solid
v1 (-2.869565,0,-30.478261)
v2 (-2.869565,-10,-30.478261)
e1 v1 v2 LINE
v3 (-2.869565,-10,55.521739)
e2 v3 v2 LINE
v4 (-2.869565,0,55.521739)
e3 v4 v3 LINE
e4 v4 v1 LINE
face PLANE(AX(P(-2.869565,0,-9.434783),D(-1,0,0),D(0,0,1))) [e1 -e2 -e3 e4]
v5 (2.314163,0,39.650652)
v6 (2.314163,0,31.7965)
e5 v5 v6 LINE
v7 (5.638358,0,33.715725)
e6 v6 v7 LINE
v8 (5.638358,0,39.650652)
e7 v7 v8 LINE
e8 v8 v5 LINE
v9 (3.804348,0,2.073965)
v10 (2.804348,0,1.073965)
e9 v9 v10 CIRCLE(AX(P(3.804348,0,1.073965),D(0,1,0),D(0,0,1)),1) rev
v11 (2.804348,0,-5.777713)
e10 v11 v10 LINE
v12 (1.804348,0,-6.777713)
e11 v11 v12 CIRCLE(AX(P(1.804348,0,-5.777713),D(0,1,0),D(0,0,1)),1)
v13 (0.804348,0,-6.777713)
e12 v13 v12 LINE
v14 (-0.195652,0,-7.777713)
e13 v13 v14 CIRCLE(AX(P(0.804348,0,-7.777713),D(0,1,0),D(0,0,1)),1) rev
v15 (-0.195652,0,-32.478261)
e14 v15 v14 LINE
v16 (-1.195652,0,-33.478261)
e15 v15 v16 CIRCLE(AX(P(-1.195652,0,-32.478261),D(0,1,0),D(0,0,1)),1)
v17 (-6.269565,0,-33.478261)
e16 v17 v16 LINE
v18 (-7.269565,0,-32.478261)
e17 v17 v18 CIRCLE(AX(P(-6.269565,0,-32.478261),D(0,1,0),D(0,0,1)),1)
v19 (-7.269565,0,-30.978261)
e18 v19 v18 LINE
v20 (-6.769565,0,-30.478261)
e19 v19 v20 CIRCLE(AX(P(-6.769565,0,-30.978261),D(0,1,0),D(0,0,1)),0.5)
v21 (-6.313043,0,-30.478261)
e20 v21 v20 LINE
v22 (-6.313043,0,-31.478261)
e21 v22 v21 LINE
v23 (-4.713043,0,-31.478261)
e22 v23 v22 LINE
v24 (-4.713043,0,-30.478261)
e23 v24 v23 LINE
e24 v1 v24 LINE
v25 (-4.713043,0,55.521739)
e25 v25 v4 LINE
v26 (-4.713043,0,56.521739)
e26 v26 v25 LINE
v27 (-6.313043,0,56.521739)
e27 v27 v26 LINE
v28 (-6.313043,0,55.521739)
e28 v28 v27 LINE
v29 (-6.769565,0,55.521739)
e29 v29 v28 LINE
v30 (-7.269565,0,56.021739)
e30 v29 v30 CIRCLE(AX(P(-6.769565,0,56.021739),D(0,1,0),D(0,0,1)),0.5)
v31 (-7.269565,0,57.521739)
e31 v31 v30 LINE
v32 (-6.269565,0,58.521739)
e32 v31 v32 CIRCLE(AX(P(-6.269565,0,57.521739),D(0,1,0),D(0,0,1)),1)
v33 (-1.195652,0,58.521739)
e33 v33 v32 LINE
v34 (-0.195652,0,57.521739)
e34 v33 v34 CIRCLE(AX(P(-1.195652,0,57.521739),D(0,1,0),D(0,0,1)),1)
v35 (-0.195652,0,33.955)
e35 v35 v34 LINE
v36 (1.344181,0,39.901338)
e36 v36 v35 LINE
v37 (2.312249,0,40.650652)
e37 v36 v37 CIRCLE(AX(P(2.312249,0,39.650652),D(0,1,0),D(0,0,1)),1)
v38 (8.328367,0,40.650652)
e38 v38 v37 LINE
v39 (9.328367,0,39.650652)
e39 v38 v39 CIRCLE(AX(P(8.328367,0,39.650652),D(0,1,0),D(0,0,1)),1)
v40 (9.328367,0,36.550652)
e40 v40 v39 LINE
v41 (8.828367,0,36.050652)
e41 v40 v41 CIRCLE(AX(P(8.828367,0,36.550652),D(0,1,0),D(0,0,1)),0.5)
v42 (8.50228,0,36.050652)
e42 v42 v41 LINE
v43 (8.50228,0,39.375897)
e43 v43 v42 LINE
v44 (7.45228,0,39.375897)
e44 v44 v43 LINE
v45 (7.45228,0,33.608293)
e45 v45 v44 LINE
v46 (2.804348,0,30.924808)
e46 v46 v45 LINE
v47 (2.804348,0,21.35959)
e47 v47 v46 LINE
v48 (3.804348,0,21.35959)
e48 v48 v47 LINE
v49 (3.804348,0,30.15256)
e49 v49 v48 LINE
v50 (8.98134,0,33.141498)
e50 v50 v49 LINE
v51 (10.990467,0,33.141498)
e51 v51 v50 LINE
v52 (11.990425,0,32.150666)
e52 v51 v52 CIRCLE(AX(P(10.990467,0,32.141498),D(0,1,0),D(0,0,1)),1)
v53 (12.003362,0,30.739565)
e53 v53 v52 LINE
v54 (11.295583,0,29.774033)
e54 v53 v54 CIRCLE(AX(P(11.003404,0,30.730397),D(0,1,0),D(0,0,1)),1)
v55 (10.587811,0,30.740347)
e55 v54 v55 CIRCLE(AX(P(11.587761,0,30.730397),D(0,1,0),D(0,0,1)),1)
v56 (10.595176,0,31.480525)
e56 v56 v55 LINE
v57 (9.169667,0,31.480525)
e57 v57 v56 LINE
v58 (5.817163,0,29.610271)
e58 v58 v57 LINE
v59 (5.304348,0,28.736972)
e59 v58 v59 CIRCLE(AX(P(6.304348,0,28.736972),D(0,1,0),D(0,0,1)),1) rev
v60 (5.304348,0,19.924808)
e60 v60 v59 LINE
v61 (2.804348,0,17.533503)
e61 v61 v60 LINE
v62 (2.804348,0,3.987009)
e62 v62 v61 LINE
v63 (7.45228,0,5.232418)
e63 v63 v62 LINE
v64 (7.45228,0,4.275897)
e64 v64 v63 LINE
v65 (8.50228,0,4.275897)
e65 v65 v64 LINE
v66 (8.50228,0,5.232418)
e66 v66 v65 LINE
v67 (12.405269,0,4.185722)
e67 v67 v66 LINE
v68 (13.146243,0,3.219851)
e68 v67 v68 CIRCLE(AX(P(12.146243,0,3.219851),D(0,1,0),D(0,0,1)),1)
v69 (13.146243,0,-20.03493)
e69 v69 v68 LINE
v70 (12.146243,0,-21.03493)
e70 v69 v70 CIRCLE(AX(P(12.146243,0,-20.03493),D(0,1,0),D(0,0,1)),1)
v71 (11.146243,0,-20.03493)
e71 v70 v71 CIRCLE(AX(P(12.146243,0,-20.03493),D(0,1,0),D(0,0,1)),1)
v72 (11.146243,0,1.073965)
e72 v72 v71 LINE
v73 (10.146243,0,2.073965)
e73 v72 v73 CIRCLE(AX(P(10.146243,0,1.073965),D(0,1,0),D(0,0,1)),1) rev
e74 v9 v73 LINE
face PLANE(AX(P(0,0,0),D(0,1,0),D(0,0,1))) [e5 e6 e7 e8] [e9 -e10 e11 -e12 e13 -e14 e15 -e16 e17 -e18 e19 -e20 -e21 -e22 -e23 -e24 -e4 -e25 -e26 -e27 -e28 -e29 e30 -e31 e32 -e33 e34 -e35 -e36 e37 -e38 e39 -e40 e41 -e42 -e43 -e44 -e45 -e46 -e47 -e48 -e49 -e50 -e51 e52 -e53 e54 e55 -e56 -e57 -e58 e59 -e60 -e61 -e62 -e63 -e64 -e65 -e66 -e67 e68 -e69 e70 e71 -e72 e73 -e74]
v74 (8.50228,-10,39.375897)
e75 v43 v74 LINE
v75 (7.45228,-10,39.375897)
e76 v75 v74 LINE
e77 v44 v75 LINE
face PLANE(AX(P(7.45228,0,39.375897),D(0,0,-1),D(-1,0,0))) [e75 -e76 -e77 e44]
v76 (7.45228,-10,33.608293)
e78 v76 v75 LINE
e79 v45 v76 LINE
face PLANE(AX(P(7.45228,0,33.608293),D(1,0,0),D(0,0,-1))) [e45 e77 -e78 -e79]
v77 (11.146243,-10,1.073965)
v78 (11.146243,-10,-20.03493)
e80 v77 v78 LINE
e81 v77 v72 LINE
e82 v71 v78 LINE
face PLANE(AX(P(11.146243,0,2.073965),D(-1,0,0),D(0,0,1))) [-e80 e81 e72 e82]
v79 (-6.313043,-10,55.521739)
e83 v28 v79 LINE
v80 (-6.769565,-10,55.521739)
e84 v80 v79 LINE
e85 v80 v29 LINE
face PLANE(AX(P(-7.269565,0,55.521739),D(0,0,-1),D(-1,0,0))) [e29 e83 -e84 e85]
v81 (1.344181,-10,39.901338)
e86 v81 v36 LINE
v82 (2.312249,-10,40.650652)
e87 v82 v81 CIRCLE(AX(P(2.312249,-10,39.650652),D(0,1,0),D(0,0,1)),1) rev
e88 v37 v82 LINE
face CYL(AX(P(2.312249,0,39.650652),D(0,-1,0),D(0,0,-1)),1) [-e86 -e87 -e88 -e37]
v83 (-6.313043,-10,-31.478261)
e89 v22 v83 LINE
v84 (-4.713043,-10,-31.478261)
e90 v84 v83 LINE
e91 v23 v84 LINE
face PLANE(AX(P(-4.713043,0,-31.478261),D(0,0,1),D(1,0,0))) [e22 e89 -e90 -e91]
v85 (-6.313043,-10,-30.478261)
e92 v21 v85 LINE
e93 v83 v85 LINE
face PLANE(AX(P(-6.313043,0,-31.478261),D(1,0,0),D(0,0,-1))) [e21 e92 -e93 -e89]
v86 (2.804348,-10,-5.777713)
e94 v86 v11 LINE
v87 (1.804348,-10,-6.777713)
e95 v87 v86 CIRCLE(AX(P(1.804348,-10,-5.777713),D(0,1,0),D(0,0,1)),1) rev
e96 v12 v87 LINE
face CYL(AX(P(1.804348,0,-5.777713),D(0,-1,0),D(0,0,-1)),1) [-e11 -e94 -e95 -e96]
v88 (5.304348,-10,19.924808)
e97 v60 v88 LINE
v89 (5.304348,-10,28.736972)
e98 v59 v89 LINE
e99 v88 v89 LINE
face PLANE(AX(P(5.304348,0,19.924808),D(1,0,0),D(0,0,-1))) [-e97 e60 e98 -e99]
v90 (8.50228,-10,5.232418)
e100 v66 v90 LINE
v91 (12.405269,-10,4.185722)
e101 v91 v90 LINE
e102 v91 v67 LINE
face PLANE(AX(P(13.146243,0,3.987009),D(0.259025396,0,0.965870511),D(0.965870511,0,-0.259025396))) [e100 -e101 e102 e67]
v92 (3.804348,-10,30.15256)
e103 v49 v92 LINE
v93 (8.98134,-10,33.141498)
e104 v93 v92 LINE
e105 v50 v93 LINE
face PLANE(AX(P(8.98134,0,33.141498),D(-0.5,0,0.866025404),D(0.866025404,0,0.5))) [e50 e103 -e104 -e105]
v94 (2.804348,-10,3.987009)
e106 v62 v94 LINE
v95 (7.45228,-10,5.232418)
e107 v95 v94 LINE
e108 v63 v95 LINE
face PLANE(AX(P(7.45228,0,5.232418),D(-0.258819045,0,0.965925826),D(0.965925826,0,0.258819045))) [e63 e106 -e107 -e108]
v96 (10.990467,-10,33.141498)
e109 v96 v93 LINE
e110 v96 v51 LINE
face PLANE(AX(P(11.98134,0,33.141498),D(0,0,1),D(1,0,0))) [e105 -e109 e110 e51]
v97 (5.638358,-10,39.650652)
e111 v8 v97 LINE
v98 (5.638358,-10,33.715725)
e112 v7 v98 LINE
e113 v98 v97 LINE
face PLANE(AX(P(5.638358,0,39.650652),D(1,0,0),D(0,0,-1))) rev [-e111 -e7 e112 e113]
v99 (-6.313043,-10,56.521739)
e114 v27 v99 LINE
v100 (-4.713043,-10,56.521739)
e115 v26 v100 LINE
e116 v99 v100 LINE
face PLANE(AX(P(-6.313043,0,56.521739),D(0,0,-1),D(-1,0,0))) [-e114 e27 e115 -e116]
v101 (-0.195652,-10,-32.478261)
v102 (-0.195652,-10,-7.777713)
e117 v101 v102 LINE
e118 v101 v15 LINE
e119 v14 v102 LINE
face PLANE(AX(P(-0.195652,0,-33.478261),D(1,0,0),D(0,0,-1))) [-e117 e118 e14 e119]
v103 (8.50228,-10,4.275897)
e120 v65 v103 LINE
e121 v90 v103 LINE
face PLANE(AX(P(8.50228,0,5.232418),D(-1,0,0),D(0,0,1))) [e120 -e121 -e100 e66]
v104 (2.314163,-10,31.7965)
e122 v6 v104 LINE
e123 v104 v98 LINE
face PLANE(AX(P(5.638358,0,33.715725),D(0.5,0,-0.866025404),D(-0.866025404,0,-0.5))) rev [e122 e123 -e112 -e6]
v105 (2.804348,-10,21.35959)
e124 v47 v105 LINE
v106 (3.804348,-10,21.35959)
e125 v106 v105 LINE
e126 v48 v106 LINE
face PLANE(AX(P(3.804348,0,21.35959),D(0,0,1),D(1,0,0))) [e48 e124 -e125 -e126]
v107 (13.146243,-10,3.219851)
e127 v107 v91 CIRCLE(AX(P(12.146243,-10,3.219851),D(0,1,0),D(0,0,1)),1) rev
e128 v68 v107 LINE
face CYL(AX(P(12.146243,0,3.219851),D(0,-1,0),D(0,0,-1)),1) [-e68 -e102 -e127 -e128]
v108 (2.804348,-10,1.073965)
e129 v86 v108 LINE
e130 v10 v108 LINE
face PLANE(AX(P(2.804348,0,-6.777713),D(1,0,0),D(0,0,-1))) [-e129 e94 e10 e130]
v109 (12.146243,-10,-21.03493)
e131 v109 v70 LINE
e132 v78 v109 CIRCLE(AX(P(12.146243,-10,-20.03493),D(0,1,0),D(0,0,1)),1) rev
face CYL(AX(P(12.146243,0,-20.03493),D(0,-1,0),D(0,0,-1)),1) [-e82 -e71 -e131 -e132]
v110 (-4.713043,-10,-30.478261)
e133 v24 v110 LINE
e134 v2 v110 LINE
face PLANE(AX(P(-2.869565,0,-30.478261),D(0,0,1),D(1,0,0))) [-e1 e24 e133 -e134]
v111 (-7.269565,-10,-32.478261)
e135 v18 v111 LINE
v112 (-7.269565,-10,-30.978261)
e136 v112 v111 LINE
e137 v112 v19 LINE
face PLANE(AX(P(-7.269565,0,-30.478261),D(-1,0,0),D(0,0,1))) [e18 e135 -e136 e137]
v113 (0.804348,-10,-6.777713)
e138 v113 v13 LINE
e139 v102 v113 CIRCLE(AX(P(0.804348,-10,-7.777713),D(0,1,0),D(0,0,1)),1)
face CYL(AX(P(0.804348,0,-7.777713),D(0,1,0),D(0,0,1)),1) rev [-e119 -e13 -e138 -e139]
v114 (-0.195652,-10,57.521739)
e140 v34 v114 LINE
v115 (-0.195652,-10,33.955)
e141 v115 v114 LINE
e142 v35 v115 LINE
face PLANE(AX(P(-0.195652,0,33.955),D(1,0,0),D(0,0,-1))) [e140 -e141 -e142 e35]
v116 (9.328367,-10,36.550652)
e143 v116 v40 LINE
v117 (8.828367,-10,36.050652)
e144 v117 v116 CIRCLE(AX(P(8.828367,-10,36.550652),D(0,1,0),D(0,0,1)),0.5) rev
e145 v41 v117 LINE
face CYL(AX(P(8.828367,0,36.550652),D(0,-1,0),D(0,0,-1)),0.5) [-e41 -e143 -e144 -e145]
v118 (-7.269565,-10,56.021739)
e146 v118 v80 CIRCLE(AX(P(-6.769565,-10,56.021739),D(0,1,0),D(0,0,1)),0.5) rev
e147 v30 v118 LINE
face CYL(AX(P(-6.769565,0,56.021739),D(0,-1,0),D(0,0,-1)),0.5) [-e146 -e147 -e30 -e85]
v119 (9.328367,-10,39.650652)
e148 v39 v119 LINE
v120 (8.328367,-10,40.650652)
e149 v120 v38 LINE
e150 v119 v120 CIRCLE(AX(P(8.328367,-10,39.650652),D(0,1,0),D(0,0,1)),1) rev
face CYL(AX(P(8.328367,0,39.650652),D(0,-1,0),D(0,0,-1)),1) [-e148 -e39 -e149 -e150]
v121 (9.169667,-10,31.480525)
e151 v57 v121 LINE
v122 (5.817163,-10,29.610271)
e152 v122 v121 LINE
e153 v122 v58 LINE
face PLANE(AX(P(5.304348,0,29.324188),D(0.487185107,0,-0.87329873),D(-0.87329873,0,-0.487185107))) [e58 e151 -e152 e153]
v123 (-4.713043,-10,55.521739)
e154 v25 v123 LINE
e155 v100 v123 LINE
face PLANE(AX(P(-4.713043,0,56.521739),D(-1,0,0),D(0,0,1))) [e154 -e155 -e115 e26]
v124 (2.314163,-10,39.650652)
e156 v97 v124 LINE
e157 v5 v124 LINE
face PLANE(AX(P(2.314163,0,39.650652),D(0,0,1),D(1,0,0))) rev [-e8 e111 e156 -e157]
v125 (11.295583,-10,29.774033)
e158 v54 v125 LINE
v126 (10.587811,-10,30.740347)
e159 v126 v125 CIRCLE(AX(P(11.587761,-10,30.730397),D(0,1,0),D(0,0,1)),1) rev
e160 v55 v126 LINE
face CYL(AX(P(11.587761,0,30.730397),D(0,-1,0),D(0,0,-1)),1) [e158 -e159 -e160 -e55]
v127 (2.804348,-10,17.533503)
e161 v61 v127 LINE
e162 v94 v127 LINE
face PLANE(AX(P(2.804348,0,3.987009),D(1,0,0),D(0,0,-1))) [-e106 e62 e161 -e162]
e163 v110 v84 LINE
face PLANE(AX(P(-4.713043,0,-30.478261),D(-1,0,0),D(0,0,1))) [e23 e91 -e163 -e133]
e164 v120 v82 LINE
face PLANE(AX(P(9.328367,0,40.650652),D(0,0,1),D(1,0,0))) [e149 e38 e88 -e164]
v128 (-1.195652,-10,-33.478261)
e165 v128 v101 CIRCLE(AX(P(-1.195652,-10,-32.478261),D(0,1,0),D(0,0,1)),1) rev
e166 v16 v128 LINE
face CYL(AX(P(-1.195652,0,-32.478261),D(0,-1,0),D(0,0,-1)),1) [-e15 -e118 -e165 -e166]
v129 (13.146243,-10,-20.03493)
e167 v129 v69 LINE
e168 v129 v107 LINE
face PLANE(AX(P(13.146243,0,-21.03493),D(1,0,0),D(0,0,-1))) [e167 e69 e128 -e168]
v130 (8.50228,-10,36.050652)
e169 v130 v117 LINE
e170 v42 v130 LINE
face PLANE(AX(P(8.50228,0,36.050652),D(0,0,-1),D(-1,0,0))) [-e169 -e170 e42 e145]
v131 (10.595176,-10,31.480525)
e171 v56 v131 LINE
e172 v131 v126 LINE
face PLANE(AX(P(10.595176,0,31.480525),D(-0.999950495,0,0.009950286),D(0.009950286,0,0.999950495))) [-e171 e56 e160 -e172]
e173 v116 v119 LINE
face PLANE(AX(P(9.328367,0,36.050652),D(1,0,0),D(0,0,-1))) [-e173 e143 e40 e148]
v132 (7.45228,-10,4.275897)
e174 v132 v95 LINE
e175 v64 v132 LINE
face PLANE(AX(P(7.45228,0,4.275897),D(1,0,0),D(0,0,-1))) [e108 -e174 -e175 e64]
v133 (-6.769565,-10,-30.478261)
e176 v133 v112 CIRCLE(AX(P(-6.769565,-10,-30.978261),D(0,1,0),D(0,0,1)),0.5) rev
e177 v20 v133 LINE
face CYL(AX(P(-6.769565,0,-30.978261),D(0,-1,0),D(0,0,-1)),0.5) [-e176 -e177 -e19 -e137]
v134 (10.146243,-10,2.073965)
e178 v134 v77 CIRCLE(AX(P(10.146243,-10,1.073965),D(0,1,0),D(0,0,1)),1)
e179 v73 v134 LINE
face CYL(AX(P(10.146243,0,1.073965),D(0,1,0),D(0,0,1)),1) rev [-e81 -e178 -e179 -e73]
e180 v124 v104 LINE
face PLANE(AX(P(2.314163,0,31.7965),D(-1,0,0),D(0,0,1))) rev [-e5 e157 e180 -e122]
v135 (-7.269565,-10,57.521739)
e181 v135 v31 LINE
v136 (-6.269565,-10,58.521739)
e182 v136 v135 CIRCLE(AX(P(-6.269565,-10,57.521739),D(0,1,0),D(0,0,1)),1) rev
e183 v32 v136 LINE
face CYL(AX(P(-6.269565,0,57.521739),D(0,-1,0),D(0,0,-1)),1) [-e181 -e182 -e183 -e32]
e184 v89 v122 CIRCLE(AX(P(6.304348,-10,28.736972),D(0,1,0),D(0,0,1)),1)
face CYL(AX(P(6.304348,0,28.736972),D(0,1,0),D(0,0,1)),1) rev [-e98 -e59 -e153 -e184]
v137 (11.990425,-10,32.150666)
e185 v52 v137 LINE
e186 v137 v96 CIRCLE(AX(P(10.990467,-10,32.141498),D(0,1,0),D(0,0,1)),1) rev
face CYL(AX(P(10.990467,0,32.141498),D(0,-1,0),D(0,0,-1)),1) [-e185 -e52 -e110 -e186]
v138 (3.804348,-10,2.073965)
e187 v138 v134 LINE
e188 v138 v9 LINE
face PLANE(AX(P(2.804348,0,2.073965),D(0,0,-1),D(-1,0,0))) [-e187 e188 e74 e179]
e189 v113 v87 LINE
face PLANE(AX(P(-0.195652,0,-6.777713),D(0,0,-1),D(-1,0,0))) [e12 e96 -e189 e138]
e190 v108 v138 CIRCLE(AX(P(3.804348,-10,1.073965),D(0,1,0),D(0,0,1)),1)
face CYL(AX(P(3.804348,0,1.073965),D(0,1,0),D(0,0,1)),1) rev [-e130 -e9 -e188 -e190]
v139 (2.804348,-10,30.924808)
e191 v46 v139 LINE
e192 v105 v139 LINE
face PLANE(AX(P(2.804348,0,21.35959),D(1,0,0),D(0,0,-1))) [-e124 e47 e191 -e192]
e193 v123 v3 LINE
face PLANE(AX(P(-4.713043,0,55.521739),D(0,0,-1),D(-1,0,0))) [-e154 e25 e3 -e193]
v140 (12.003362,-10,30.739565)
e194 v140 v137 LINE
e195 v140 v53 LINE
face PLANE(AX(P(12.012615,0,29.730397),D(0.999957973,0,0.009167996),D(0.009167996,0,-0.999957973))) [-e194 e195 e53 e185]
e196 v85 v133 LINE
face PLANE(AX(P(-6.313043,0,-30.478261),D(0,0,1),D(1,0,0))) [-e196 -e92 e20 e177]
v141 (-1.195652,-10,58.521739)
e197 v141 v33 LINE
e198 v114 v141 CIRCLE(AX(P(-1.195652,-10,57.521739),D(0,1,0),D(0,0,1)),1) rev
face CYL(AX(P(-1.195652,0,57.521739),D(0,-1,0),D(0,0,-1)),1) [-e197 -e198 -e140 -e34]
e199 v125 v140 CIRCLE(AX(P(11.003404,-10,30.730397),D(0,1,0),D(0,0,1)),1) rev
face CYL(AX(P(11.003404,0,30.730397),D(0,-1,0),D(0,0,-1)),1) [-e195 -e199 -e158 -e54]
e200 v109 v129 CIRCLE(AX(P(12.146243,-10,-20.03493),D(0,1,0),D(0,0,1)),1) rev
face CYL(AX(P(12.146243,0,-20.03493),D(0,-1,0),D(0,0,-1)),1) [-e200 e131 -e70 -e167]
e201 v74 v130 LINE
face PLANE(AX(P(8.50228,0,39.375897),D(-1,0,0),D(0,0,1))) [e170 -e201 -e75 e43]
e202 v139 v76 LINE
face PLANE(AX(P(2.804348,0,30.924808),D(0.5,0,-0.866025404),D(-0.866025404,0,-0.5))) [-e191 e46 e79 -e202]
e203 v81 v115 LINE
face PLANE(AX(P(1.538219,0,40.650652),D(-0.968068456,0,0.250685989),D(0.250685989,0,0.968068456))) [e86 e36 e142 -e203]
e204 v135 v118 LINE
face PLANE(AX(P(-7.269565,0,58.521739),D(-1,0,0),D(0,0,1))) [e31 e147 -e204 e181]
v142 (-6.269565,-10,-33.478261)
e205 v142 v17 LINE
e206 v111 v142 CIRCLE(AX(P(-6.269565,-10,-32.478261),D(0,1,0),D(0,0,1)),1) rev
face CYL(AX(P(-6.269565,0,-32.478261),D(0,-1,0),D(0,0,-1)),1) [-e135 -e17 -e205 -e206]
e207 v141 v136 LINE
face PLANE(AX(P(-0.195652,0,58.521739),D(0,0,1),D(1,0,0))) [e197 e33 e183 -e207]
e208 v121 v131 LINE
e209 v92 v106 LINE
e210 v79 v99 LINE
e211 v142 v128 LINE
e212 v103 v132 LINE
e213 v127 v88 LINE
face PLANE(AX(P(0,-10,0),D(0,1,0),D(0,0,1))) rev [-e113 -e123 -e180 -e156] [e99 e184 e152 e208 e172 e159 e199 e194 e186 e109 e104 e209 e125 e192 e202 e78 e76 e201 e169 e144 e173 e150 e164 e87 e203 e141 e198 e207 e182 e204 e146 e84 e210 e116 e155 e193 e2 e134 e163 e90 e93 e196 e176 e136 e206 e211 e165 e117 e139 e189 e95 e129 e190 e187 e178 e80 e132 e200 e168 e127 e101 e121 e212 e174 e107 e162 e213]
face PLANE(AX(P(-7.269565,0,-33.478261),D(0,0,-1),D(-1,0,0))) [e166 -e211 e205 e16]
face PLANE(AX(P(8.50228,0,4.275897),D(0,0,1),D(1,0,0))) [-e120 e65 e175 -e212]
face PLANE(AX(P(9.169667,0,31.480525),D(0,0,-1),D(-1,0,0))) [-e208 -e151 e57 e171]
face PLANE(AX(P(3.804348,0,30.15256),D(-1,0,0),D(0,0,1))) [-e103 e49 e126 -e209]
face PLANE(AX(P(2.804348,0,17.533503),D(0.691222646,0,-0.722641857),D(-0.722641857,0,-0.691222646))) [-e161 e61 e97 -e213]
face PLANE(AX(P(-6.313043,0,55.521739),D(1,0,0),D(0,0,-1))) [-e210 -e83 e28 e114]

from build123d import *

# Parameters (mm, degrees)
BOSS_EXTRUDE1_DEPTH = 10
FILLET1_R           = 1
FILLET2_R           = 0.5


with BuildPart() as part:
    # Sketch1 → Boss-Extrude1 (new body)
    with BuildSketch(Plane.XZ.offset(10)):
        Polygon((2.804347826, 17.533503473), (5.304347826, 19.924807821), (5.304347826, 29.324187975), (9.169667061, 31.480524519), (10.595176157, 31.480524519), (10.577761024, 29.730396695), (12.012614665, 29.730396695), (11.981340388, 33.141498149), (8.981340388, 33.141498149), (3.804347826, 30.1525601), (3.804347826, 21.359590429), (2.804347826, 21.359590429), (2.804347826, 30.924807821), (7.452279989, 33.608292706), (7.452279989, 39.375896583), (8.502279989, 39.375896583), (8.502279989, 36.050651768), (9.328366946, 36.050651768), (9.328366946, 40.650651768), (1.538219203, 40.650651768), (-0.195652174, 33.954999595), (-0.195652174, 58.52173913), (-7.269565217, 58.52173913), (-7.269565217, 55.52173913), (-6.313043478, 55.52173913), (-6.313043478, 56.52173913), (-4.713043478, 56.52173913), (-4.713043478, 55.52173913), (-2.869565217, 55.52173913), (-2.869565217, 4.387220823), (-2.869565217, -9.434782609), (-2.869565217, -30.47826087), (-4.713043478, -30.47826087), (-4.713043478, -31.47826087), (-6.313043478, -31.47826087), (-6.313043478, -30.47826087), (-7.269565217, -30.47826087), (-7.269565217, -33.47826087), (-0.195652174, -33.47826087), (-0.195652174, -6.777713361), (2.804347826, -6.777713361), (2.804347826, 2.073965174), (11.146243443, 2.073965174), (11.146243443, -21.034930407), (13.146243443, -21.034930407), (13.146243443, 3.987008652), (8.502279989, 5.232418322), (8.502279989, 4.275896583), (7.452279989, 4.275896583), (7.452279989, 5.232418322), (2.804347826, 3.987008652), align=None)
        Polygon((2.31416262, 31.796499798), (2.31416262, 39.650651768), (5.638358328, 39.650651768), (5.638358328, 33.715725085), align=None, mode=Mode.SUBTRACT)
    extrude(amount=-BOSS_EXTRUDE1_DEPTH)

    # Fillet1
    # the kernel refuses this fillet: 1 mm, written as the material it adds along each edge
    with BuildSketch(Plane(origin=(2.804347826, -10, 2.073965174), x_dir=(1, 0, 0), z_dir=(0, 1, 0)), Plane(origin=(-0.195652174, -10, -6.777713361), x_dir=(1, 0, 0), z_dir=(0, 1, 0)), Plane(origin=(11.146243443, -10, 2.073965174), x_dir=(0, 0, -1), z_dir=(0, 1, 0))) as fillet1_piece_1:
        with BuildLine():
            CenterArc((FILLET1_R, FILLET1_R), FILLET1_R, 180, 90)
            Line((0, FILLET1_R), (0, 0))
            Line((0, 0), (FILLET1_R, 0))
        make_face()
    extrude(amount=10)
    with BuildSketch(Plane(origin=(5.304347826, -10, 29.324187975), x_dir=(0.8732987298442874, 0, 0.48718510696895734), z_dir=(0, 1, 0))) as fillet1_piece_2:
        with BuildLine():
            CenterArc((FILLET1_R * 0.587215892462, FILLET1_R), FILLET1_R, 209.155734131, 60.844265869)
            Line((-FILLET1_R * 0.286082837383, FILLET1_R * 0.512814893031), (0, 0))
            Line((0, 0), (FILLET1_R * 0.587215892462, 0))
        make_face()
    extrude(amount=10)
    # the kernel refuses this fillet: 1 mm, written as the material it takes off along each edge
    with BuildSketch(Plane(origin=(11.981340388, -12.47718412, 33.141498149), x_dir=(0.009167995584995172, 0, -0.9999579730453443), z_dir=(0, 1, 0))) as fillet1_2_piece_1:
        with BuildLine():
            CenterArc((FILLET1_R * 0.990873647817, FILLET1_R), FILLET1_R, 180.525294812, 89.474705188)
            Line((-FILLET1_R * 0.00908432522847, FILLET1_R * 0.990832004415), (0, 0))
            Line((0, 0), (FILLET1_R * 0.990873647817, 0))
        make_face()
    extrude(amount=14.954368239, mode=Mode.SUBTRACT)
    with BuildSketch(Plane(origin=(10.577761024, -12.525000715, 29.730396695), x_dir=(0.009950285545768225, 0, 0.9999504946833906), z_dir=(0, 1, 0))) as fillet1_2_piece_2:
        with BuildLine():
            CenterArc((FILLET1_R * 1.01000028593, FILLET1_R), FILLET1_R, 179.429881225, 90.570118775)
            Line((FILLET1_R * 0.0100497912463, FILLET1_R * 1.00995028555), (0, 0))
            Line((0, 0), (FILLET1_R * 1.01000028593, 0))
        make_face()
    extrude(amount=15.05000143, mode=Mode.SUBTRACT)
    with BuildSketch(Plane(origin=(12.012614665, -12.523026024, 29.730396695), x_dir=(-1, 0, 0), z_dir=(0, 1, 0))) as fillet1_2_piece_3:
        with BuildLine():
            CenterArc((FILLET1_R * 1.00921040963, FILLET1_R), FILLET1_R, 179.474705188, 90.525294812)
            Line((FILLET1_R * 0.00925243657978, FILLET1_R * 1.00916799558), (0, 0))
            Line((0, 0), (FILLET1_R * 1.00921040963, 0))
        make_face()
    extrude(amount=15.046052048, mode=Mode.SUBTRACT)
    with BuildSketch(Plane(origin=(13.146243443, -12.5, -21.034930407), x_dir=(-1, 0, 0), z_dir=(0, 1, 0)), Plane(origin=(2.804347826, -12.5, -6.777713361), x_dir=(-1, 0, 0), z_dir=(0, 1, 0)), Plane(origin=(11.146243443, -12.5, -21.034930407), x_dir=(0, 0, 1), z_dir=(0, 1, 0)), Plane(origin=(-0.195652174, -12.5, -33.47826087), x_dir=(-1, 0, 0), z_dir=(0, 1, 0)), Plane(origin=(-7.269565217, -12.5, -33.47826087), x_dir=(0, 0, 1), z_dir=(0, 1, 0)), Plane(origin=(-7.269565217, -12.5, 58.52173913), x_dir=(1, 0, 0), z_dir=(0, 1, 0)), Plane(origin=(-0.195652174, -12.5, 58.52173913), x_dir=(0, 0, -1), z_dir=(0, 1, 0)), Plane(origin=(9.328366946, -12.5, 40.650651768), x_dir=(0, 0, -1), z_dir=(0, 1, 0))) as fillet1_2_piece_4:
        with BuildLine():
            CenterArc((FILLET1_R, FILLET1_R), FILLET1_R, 180, 90)
            Line((0, FILLET1_R), (0, 0))
            Line((0, 0), (FILLET1_R, 0))
        make_face()
    extrude(amount=15, mode=Mode.SUBTRACT)
    with BuildSketch(Plane(origin=(13.146243443, -11.917893225, 3.987008652), x_dir=(0, 0, -1), z_dir=(0, 1, 0))) as fillet1_2_piece_5:
        with BuildLine():
            CenterArc((FILLET1_R * 0.76715728997, FILLET1_R), FILLET1_R, 195.012240475, 74.987759525)
            Line((-FILLET1_R * 0.198713221058, FILLET1_R * 0.740974603702), (0, 0))
            Line((0, 0), (FILLET1_R * 0.76715728997, 0))
        make_face()
    extrude(amount=13.83578645, mode=Mode.SUBTRACT)
    with BuildSketch(Plane(origin=(1.538219203, -11.935074959, 40.650651768), x_dir=(1, 0, 0), z_dir=(0, 1, 0))) as fillet1_2_piece_6:
        with BuildLine():
            CenterArc((FILLET1_R * 0.774029983779, FILLET1_R), FILLET1_R, 194.518109178, 75.481890822)
            Line((-FILLET1_R * 0.19403847194, FILLET1_R * 0.749314011077), (0, 0))
            Line((0, 0), (FILLET1_R * 0.774029983779, 0))
        make_face()
    extrude(amount=13.870149919, mode=Mode.SUBTRACT)

    # Fillet2
    fillet2_edges = [part.edges().sort_by_distance(p)[0] for p in [
        (-7.269565217, -5, -30.47826087),
        (-7.269565217, -5, 55.52173913),
        (9.328366946, -5, 36.050651768),
    ]]
    fillet(fillet2_edges, radius=FILLET2_R)


solid = part.part
